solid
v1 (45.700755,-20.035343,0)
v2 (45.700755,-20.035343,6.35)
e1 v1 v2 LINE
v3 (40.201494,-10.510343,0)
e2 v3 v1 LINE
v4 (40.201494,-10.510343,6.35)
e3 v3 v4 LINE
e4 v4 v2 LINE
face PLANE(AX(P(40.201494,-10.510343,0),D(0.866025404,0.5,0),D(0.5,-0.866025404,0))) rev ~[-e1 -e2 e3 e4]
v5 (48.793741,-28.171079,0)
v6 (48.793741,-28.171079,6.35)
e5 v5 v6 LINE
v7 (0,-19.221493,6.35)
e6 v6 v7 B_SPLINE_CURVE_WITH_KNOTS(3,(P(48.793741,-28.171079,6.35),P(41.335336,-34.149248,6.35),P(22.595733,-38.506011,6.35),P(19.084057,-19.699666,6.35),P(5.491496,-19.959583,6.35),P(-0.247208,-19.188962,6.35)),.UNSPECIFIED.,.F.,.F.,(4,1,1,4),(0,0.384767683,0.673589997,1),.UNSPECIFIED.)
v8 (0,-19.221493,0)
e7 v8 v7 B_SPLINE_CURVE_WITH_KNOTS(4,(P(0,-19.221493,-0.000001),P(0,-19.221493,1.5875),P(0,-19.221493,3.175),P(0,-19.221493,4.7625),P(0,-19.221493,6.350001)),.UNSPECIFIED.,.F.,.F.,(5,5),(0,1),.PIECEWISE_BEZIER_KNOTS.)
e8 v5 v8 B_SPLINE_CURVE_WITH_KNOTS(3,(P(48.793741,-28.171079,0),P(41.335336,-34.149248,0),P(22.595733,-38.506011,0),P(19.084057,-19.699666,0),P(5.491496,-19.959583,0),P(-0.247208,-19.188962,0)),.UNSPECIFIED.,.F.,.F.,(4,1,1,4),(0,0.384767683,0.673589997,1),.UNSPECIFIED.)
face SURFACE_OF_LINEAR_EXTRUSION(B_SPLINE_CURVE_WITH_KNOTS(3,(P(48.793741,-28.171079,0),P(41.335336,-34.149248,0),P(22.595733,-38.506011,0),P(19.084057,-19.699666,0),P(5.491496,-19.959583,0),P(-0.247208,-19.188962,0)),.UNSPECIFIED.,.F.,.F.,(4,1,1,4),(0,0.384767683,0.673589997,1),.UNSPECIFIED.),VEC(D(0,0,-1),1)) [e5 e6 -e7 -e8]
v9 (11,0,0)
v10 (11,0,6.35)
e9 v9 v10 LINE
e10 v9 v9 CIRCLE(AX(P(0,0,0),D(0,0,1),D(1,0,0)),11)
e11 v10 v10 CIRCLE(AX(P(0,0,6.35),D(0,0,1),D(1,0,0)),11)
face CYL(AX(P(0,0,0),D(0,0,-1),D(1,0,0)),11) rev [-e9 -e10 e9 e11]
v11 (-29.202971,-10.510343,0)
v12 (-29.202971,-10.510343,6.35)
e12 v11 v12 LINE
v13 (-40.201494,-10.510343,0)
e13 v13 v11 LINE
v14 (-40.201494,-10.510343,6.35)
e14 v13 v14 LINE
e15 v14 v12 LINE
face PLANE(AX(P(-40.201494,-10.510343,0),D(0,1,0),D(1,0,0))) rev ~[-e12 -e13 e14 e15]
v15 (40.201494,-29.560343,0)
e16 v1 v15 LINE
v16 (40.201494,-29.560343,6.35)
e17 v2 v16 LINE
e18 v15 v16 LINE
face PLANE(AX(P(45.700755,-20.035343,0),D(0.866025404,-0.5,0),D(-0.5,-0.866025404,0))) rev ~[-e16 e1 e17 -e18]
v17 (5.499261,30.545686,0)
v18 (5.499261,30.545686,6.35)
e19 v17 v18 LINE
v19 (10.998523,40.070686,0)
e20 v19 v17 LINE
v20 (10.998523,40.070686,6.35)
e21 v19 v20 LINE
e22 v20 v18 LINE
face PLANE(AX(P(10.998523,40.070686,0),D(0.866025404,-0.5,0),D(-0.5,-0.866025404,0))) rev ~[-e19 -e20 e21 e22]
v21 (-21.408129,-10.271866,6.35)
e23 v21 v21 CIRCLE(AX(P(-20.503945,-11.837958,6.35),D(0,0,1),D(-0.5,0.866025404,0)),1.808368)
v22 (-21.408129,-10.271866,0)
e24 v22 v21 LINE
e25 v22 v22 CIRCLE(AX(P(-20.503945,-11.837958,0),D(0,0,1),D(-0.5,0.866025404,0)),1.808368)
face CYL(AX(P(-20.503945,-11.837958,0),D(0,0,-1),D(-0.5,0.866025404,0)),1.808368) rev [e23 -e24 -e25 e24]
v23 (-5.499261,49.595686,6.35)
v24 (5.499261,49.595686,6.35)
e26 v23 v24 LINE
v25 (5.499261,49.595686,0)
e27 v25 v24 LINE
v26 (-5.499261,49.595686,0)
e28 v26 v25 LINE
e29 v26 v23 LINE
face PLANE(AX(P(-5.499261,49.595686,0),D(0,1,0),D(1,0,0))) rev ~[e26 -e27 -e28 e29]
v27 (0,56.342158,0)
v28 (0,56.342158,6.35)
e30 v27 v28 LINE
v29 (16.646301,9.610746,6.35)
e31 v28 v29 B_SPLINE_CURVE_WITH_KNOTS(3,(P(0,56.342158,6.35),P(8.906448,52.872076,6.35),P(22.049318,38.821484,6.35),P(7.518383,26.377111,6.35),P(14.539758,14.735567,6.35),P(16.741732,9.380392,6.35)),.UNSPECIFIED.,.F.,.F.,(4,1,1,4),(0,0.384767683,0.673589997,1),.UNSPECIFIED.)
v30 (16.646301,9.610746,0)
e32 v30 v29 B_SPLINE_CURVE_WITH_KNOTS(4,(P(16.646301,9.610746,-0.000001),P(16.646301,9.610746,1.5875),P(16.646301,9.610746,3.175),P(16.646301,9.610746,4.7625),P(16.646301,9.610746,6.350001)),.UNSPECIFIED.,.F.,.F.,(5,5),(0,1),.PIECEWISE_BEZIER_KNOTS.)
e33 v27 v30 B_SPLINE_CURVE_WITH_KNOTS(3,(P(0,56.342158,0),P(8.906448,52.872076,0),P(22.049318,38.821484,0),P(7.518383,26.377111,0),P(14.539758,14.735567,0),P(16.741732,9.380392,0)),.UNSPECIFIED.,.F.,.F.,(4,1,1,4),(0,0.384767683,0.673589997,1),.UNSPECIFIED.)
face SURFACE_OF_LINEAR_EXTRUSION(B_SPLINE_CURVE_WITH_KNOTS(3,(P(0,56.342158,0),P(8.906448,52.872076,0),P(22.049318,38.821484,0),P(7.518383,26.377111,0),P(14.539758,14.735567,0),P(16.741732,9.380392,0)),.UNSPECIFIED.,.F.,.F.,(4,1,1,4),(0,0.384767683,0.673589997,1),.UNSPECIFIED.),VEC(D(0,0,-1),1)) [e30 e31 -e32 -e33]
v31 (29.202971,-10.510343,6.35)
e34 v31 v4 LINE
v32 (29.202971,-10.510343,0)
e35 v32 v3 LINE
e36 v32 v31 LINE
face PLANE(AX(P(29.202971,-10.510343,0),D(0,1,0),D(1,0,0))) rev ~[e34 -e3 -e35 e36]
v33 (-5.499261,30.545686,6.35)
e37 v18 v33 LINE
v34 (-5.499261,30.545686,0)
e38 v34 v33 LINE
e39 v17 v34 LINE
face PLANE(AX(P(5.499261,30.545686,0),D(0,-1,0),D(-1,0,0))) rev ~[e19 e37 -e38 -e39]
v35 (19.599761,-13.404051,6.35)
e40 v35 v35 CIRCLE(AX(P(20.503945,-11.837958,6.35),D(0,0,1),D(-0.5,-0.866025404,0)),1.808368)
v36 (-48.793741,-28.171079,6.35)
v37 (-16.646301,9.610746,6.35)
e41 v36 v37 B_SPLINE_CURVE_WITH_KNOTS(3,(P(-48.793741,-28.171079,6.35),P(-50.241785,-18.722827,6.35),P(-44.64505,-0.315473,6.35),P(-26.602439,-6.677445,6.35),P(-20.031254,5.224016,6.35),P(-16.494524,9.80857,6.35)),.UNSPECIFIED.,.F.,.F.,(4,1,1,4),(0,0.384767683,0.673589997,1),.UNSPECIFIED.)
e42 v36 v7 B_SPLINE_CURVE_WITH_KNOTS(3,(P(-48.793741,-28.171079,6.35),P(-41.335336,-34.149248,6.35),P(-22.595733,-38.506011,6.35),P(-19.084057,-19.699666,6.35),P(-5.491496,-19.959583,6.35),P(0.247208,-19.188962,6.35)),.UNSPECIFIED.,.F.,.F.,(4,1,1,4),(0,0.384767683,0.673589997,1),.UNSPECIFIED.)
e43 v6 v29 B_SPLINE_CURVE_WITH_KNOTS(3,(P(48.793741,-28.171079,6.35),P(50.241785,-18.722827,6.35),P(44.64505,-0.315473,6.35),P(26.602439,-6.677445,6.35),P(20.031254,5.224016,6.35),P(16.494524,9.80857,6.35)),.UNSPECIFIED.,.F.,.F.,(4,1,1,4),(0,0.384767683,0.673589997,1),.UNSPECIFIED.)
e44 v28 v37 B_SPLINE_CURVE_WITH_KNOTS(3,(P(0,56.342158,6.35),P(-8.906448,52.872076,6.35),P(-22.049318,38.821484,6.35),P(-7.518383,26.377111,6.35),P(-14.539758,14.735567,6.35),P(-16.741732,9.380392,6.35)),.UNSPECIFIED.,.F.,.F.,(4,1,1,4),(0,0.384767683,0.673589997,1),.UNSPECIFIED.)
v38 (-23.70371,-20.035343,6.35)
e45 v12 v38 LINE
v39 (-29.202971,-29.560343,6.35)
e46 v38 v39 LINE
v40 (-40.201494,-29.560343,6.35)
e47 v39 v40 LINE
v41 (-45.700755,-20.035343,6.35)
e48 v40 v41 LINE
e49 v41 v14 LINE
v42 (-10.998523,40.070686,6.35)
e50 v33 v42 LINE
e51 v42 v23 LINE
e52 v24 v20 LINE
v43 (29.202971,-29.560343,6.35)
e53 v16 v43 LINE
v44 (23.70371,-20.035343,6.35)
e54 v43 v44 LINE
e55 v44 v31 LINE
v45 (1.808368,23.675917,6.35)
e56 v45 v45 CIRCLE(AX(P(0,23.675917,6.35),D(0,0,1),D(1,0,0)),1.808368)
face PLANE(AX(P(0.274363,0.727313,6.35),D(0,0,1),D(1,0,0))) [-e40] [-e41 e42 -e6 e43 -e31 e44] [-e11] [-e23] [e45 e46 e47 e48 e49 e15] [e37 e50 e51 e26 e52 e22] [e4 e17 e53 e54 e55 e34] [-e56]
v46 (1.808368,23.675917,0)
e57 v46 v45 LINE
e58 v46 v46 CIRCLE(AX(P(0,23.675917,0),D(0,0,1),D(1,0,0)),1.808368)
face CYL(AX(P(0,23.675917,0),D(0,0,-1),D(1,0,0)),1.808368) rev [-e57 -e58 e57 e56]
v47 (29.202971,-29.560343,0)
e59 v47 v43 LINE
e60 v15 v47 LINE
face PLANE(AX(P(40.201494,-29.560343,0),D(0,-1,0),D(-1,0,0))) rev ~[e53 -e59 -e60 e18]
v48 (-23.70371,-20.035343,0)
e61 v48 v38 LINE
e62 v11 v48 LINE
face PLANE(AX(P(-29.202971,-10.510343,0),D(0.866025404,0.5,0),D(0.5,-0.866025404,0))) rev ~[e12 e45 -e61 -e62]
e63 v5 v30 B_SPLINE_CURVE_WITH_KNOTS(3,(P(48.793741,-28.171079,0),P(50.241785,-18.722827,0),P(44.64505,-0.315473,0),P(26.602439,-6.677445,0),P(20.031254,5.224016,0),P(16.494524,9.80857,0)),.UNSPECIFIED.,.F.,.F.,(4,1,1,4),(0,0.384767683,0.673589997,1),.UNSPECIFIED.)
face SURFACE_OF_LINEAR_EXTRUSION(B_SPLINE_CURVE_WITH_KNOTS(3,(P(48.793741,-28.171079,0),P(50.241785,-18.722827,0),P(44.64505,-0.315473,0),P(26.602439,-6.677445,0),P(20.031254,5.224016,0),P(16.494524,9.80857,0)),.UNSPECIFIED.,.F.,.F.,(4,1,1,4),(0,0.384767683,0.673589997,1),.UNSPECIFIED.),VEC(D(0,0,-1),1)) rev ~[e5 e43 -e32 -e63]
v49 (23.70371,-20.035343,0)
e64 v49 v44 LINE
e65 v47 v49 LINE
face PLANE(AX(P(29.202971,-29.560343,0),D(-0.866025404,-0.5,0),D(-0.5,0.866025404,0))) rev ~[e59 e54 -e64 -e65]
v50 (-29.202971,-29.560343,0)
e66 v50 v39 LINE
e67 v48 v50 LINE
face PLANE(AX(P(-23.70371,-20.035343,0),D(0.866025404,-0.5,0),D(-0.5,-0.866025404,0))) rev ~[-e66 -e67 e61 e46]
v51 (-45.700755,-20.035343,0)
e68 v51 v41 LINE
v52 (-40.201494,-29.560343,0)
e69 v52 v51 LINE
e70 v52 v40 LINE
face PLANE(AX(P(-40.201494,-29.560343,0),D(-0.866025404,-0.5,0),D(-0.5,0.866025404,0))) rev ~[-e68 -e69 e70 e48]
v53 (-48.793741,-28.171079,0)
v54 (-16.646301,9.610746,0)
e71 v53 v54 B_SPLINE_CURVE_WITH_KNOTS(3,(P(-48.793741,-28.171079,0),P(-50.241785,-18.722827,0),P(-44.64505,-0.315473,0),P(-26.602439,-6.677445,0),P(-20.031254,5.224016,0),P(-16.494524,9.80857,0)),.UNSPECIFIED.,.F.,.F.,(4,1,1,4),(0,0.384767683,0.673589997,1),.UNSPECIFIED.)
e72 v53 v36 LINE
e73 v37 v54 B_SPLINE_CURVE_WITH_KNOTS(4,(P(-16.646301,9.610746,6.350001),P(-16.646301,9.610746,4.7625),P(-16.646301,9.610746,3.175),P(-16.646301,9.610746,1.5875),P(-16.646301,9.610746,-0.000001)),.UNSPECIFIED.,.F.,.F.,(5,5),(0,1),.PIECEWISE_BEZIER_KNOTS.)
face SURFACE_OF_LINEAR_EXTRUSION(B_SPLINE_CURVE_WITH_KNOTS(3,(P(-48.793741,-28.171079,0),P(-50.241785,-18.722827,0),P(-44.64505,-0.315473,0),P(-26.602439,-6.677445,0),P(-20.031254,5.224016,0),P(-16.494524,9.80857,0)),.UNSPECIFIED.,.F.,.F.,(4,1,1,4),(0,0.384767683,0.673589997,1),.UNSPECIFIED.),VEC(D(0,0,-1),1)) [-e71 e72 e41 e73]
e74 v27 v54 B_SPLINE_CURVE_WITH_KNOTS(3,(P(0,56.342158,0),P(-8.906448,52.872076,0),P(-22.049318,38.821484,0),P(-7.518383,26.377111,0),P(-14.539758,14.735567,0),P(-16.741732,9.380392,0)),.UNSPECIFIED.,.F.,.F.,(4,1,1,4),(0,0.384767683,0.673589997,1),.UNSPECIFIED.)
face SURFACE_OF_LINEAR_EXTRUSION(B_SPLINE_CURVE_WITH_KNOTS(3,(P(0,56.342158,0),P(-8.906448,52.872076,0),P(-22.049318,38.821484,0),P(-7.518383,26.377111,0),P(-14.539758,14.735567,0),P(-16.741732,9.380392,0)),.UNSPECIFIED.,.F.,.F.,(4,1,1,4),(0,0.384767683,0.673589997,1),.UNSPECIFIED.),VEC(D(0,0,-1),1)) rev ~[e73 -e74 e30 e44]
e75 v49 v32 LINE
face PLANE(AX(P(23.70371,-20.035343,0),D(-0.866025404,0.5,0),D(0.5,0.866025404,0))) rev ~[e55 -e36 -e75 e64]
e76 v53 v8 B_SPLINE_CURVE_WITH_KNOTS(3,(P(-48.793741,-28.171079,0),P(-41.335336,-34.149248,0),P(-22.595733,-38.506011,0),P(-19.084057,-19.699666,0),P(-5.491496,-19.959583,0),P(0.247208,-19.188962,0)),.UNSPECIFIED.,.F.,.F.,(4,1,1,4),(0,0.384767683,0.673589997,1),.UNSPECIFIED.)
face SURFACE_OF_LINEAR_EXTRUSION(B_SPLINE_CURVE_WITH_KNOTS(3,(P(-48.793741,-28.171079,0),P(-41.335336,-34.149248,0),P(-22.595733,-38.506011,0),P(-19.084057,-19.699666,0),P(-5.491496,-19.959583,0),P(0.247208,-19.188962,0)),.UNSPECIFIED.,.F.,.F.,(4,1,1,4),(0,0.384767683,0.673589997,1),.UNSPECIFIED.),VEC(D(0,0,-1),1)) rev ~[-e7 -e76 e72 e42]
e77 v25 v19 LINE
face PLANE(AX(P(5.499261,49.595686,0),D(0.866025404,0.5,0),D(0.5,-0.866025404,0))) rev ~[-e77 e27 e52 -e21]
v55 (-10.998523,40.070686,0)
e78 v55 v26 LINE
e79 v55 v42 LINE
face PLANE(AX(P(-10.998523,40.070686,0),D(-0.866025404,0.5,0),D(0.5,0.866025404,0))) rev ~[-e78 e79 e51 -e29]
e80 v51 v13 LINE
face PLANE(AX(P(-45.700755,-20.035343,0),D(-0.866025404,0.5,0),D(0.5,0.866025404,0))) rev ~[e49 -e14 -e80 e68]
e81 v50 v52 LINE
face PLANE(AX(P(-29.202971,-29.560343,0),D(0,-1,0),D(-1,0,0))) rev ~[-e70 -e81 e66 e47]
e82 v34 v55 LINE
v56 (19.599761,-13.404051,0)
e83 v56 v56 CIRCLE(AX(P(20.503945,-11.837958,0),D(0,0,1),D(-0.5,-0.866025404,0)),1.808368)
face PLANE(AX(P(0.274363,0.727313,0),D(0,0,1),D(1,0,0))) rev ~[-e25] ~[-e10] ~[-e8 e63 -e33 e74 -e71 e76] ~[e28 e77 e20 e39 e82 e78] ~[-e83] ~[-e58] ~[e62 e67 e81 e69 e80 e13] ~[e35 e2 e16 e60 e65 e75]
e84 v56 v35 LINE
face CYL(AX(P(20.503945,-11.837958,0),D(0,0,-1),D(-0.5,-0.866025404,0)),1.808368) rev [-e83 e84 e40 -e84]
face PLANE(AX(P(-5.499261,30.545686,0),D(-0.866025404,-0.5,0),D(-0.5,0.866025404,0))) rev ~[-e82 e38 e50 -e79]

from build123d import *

# Parameters (mm, degrees)
F0_R     = 11
F0_R_2   = 1.8083680483
F1_DEPTH = 6.35
F2_COUNT = 3


# Not quite as in the source:
# - a feature names something its author has since deleted; it is built from what else it names


with BuildPart() as f1:
    # F0 (on Top) → F1 (new body)
    with BuildSketch(Plane.XY):
        with BuildLine():
            ThreePointArc((-16.7417324202, 9.3803920133), (-4.8473828231, -18.5682588984), (19.1905538938, 0))
            ThreePointArc((19.1905538938, 0), (18.5682588984, 4.8473828231), (16.7417324202, 9.3803920133))
            ThreePointArc((16.7417324202, 9.3803920133), (0, 19.1905538938), (-16.7417324202, 9.3803920133))
        make_face()
        Circle(F0_R, mode=Mode.SUBTRACT)
        with BuildLine():
            ThreePointArc((-16.7417324202, 9.3803920133), (0, 19.1905538938), (16.7417324202, 9.3803920133))
            add(Edge.make_bspline(
                [(0, 56.3421584666), (8.906448223, 52.8720755357), (22.0493176942, 38.8214841524), (7.5183827246, 26.377110806), (14.5397577828, 14.7355665073), (16.7417324202, 9.3803920133)],
                knots=[0, 0, 0, 0, 0.3847676827, 0.6735899971, 1, 1, 1, 1], degree=3))
            add(Edge.make_bspline(
                [(0, 56.3421584666), (-8.906448223, 52.8720755357), (-22.0493176942, 38.8214841524), (-7.5183827246, 26.377110806), (-14.5397577828, 14.7355665073), (-16.7417324202, 9.3803920133)],
                knots=[0, 0, 0, 0, 0.3847676827, 0.6735899971, 1, 1, 1, 1], degree=3))
        make_face()
        with Locations((0, 23.6759167165)):
            Circle(F0_R_2, mode=Mode.SUBTRACT)
        Polygon((10.9985226281, 40.0706864893), (5.499261314, 30.5456864893), (-5.499261314, 30.5456864893), (-10.9985226281, 40.0706864893), (-5.499261314, 49.5956864893), (5.499261314, 49.5956864893), align=None, mode=Mode.SUBTRACT)
    extrude(amount=F1_DEPTH)

    # F2: F1 ×3 about axis
    f2_axis = Axis((0, 0, 0), (0, 0, -1))


with BuildPart() as f1_1:
    add(f1.part)
    for i in range(1, F2_COUNT):
        add(f1.part.rotate(f2_axis, i * 360 / F2_COUNT))


solid = f1_1.part
